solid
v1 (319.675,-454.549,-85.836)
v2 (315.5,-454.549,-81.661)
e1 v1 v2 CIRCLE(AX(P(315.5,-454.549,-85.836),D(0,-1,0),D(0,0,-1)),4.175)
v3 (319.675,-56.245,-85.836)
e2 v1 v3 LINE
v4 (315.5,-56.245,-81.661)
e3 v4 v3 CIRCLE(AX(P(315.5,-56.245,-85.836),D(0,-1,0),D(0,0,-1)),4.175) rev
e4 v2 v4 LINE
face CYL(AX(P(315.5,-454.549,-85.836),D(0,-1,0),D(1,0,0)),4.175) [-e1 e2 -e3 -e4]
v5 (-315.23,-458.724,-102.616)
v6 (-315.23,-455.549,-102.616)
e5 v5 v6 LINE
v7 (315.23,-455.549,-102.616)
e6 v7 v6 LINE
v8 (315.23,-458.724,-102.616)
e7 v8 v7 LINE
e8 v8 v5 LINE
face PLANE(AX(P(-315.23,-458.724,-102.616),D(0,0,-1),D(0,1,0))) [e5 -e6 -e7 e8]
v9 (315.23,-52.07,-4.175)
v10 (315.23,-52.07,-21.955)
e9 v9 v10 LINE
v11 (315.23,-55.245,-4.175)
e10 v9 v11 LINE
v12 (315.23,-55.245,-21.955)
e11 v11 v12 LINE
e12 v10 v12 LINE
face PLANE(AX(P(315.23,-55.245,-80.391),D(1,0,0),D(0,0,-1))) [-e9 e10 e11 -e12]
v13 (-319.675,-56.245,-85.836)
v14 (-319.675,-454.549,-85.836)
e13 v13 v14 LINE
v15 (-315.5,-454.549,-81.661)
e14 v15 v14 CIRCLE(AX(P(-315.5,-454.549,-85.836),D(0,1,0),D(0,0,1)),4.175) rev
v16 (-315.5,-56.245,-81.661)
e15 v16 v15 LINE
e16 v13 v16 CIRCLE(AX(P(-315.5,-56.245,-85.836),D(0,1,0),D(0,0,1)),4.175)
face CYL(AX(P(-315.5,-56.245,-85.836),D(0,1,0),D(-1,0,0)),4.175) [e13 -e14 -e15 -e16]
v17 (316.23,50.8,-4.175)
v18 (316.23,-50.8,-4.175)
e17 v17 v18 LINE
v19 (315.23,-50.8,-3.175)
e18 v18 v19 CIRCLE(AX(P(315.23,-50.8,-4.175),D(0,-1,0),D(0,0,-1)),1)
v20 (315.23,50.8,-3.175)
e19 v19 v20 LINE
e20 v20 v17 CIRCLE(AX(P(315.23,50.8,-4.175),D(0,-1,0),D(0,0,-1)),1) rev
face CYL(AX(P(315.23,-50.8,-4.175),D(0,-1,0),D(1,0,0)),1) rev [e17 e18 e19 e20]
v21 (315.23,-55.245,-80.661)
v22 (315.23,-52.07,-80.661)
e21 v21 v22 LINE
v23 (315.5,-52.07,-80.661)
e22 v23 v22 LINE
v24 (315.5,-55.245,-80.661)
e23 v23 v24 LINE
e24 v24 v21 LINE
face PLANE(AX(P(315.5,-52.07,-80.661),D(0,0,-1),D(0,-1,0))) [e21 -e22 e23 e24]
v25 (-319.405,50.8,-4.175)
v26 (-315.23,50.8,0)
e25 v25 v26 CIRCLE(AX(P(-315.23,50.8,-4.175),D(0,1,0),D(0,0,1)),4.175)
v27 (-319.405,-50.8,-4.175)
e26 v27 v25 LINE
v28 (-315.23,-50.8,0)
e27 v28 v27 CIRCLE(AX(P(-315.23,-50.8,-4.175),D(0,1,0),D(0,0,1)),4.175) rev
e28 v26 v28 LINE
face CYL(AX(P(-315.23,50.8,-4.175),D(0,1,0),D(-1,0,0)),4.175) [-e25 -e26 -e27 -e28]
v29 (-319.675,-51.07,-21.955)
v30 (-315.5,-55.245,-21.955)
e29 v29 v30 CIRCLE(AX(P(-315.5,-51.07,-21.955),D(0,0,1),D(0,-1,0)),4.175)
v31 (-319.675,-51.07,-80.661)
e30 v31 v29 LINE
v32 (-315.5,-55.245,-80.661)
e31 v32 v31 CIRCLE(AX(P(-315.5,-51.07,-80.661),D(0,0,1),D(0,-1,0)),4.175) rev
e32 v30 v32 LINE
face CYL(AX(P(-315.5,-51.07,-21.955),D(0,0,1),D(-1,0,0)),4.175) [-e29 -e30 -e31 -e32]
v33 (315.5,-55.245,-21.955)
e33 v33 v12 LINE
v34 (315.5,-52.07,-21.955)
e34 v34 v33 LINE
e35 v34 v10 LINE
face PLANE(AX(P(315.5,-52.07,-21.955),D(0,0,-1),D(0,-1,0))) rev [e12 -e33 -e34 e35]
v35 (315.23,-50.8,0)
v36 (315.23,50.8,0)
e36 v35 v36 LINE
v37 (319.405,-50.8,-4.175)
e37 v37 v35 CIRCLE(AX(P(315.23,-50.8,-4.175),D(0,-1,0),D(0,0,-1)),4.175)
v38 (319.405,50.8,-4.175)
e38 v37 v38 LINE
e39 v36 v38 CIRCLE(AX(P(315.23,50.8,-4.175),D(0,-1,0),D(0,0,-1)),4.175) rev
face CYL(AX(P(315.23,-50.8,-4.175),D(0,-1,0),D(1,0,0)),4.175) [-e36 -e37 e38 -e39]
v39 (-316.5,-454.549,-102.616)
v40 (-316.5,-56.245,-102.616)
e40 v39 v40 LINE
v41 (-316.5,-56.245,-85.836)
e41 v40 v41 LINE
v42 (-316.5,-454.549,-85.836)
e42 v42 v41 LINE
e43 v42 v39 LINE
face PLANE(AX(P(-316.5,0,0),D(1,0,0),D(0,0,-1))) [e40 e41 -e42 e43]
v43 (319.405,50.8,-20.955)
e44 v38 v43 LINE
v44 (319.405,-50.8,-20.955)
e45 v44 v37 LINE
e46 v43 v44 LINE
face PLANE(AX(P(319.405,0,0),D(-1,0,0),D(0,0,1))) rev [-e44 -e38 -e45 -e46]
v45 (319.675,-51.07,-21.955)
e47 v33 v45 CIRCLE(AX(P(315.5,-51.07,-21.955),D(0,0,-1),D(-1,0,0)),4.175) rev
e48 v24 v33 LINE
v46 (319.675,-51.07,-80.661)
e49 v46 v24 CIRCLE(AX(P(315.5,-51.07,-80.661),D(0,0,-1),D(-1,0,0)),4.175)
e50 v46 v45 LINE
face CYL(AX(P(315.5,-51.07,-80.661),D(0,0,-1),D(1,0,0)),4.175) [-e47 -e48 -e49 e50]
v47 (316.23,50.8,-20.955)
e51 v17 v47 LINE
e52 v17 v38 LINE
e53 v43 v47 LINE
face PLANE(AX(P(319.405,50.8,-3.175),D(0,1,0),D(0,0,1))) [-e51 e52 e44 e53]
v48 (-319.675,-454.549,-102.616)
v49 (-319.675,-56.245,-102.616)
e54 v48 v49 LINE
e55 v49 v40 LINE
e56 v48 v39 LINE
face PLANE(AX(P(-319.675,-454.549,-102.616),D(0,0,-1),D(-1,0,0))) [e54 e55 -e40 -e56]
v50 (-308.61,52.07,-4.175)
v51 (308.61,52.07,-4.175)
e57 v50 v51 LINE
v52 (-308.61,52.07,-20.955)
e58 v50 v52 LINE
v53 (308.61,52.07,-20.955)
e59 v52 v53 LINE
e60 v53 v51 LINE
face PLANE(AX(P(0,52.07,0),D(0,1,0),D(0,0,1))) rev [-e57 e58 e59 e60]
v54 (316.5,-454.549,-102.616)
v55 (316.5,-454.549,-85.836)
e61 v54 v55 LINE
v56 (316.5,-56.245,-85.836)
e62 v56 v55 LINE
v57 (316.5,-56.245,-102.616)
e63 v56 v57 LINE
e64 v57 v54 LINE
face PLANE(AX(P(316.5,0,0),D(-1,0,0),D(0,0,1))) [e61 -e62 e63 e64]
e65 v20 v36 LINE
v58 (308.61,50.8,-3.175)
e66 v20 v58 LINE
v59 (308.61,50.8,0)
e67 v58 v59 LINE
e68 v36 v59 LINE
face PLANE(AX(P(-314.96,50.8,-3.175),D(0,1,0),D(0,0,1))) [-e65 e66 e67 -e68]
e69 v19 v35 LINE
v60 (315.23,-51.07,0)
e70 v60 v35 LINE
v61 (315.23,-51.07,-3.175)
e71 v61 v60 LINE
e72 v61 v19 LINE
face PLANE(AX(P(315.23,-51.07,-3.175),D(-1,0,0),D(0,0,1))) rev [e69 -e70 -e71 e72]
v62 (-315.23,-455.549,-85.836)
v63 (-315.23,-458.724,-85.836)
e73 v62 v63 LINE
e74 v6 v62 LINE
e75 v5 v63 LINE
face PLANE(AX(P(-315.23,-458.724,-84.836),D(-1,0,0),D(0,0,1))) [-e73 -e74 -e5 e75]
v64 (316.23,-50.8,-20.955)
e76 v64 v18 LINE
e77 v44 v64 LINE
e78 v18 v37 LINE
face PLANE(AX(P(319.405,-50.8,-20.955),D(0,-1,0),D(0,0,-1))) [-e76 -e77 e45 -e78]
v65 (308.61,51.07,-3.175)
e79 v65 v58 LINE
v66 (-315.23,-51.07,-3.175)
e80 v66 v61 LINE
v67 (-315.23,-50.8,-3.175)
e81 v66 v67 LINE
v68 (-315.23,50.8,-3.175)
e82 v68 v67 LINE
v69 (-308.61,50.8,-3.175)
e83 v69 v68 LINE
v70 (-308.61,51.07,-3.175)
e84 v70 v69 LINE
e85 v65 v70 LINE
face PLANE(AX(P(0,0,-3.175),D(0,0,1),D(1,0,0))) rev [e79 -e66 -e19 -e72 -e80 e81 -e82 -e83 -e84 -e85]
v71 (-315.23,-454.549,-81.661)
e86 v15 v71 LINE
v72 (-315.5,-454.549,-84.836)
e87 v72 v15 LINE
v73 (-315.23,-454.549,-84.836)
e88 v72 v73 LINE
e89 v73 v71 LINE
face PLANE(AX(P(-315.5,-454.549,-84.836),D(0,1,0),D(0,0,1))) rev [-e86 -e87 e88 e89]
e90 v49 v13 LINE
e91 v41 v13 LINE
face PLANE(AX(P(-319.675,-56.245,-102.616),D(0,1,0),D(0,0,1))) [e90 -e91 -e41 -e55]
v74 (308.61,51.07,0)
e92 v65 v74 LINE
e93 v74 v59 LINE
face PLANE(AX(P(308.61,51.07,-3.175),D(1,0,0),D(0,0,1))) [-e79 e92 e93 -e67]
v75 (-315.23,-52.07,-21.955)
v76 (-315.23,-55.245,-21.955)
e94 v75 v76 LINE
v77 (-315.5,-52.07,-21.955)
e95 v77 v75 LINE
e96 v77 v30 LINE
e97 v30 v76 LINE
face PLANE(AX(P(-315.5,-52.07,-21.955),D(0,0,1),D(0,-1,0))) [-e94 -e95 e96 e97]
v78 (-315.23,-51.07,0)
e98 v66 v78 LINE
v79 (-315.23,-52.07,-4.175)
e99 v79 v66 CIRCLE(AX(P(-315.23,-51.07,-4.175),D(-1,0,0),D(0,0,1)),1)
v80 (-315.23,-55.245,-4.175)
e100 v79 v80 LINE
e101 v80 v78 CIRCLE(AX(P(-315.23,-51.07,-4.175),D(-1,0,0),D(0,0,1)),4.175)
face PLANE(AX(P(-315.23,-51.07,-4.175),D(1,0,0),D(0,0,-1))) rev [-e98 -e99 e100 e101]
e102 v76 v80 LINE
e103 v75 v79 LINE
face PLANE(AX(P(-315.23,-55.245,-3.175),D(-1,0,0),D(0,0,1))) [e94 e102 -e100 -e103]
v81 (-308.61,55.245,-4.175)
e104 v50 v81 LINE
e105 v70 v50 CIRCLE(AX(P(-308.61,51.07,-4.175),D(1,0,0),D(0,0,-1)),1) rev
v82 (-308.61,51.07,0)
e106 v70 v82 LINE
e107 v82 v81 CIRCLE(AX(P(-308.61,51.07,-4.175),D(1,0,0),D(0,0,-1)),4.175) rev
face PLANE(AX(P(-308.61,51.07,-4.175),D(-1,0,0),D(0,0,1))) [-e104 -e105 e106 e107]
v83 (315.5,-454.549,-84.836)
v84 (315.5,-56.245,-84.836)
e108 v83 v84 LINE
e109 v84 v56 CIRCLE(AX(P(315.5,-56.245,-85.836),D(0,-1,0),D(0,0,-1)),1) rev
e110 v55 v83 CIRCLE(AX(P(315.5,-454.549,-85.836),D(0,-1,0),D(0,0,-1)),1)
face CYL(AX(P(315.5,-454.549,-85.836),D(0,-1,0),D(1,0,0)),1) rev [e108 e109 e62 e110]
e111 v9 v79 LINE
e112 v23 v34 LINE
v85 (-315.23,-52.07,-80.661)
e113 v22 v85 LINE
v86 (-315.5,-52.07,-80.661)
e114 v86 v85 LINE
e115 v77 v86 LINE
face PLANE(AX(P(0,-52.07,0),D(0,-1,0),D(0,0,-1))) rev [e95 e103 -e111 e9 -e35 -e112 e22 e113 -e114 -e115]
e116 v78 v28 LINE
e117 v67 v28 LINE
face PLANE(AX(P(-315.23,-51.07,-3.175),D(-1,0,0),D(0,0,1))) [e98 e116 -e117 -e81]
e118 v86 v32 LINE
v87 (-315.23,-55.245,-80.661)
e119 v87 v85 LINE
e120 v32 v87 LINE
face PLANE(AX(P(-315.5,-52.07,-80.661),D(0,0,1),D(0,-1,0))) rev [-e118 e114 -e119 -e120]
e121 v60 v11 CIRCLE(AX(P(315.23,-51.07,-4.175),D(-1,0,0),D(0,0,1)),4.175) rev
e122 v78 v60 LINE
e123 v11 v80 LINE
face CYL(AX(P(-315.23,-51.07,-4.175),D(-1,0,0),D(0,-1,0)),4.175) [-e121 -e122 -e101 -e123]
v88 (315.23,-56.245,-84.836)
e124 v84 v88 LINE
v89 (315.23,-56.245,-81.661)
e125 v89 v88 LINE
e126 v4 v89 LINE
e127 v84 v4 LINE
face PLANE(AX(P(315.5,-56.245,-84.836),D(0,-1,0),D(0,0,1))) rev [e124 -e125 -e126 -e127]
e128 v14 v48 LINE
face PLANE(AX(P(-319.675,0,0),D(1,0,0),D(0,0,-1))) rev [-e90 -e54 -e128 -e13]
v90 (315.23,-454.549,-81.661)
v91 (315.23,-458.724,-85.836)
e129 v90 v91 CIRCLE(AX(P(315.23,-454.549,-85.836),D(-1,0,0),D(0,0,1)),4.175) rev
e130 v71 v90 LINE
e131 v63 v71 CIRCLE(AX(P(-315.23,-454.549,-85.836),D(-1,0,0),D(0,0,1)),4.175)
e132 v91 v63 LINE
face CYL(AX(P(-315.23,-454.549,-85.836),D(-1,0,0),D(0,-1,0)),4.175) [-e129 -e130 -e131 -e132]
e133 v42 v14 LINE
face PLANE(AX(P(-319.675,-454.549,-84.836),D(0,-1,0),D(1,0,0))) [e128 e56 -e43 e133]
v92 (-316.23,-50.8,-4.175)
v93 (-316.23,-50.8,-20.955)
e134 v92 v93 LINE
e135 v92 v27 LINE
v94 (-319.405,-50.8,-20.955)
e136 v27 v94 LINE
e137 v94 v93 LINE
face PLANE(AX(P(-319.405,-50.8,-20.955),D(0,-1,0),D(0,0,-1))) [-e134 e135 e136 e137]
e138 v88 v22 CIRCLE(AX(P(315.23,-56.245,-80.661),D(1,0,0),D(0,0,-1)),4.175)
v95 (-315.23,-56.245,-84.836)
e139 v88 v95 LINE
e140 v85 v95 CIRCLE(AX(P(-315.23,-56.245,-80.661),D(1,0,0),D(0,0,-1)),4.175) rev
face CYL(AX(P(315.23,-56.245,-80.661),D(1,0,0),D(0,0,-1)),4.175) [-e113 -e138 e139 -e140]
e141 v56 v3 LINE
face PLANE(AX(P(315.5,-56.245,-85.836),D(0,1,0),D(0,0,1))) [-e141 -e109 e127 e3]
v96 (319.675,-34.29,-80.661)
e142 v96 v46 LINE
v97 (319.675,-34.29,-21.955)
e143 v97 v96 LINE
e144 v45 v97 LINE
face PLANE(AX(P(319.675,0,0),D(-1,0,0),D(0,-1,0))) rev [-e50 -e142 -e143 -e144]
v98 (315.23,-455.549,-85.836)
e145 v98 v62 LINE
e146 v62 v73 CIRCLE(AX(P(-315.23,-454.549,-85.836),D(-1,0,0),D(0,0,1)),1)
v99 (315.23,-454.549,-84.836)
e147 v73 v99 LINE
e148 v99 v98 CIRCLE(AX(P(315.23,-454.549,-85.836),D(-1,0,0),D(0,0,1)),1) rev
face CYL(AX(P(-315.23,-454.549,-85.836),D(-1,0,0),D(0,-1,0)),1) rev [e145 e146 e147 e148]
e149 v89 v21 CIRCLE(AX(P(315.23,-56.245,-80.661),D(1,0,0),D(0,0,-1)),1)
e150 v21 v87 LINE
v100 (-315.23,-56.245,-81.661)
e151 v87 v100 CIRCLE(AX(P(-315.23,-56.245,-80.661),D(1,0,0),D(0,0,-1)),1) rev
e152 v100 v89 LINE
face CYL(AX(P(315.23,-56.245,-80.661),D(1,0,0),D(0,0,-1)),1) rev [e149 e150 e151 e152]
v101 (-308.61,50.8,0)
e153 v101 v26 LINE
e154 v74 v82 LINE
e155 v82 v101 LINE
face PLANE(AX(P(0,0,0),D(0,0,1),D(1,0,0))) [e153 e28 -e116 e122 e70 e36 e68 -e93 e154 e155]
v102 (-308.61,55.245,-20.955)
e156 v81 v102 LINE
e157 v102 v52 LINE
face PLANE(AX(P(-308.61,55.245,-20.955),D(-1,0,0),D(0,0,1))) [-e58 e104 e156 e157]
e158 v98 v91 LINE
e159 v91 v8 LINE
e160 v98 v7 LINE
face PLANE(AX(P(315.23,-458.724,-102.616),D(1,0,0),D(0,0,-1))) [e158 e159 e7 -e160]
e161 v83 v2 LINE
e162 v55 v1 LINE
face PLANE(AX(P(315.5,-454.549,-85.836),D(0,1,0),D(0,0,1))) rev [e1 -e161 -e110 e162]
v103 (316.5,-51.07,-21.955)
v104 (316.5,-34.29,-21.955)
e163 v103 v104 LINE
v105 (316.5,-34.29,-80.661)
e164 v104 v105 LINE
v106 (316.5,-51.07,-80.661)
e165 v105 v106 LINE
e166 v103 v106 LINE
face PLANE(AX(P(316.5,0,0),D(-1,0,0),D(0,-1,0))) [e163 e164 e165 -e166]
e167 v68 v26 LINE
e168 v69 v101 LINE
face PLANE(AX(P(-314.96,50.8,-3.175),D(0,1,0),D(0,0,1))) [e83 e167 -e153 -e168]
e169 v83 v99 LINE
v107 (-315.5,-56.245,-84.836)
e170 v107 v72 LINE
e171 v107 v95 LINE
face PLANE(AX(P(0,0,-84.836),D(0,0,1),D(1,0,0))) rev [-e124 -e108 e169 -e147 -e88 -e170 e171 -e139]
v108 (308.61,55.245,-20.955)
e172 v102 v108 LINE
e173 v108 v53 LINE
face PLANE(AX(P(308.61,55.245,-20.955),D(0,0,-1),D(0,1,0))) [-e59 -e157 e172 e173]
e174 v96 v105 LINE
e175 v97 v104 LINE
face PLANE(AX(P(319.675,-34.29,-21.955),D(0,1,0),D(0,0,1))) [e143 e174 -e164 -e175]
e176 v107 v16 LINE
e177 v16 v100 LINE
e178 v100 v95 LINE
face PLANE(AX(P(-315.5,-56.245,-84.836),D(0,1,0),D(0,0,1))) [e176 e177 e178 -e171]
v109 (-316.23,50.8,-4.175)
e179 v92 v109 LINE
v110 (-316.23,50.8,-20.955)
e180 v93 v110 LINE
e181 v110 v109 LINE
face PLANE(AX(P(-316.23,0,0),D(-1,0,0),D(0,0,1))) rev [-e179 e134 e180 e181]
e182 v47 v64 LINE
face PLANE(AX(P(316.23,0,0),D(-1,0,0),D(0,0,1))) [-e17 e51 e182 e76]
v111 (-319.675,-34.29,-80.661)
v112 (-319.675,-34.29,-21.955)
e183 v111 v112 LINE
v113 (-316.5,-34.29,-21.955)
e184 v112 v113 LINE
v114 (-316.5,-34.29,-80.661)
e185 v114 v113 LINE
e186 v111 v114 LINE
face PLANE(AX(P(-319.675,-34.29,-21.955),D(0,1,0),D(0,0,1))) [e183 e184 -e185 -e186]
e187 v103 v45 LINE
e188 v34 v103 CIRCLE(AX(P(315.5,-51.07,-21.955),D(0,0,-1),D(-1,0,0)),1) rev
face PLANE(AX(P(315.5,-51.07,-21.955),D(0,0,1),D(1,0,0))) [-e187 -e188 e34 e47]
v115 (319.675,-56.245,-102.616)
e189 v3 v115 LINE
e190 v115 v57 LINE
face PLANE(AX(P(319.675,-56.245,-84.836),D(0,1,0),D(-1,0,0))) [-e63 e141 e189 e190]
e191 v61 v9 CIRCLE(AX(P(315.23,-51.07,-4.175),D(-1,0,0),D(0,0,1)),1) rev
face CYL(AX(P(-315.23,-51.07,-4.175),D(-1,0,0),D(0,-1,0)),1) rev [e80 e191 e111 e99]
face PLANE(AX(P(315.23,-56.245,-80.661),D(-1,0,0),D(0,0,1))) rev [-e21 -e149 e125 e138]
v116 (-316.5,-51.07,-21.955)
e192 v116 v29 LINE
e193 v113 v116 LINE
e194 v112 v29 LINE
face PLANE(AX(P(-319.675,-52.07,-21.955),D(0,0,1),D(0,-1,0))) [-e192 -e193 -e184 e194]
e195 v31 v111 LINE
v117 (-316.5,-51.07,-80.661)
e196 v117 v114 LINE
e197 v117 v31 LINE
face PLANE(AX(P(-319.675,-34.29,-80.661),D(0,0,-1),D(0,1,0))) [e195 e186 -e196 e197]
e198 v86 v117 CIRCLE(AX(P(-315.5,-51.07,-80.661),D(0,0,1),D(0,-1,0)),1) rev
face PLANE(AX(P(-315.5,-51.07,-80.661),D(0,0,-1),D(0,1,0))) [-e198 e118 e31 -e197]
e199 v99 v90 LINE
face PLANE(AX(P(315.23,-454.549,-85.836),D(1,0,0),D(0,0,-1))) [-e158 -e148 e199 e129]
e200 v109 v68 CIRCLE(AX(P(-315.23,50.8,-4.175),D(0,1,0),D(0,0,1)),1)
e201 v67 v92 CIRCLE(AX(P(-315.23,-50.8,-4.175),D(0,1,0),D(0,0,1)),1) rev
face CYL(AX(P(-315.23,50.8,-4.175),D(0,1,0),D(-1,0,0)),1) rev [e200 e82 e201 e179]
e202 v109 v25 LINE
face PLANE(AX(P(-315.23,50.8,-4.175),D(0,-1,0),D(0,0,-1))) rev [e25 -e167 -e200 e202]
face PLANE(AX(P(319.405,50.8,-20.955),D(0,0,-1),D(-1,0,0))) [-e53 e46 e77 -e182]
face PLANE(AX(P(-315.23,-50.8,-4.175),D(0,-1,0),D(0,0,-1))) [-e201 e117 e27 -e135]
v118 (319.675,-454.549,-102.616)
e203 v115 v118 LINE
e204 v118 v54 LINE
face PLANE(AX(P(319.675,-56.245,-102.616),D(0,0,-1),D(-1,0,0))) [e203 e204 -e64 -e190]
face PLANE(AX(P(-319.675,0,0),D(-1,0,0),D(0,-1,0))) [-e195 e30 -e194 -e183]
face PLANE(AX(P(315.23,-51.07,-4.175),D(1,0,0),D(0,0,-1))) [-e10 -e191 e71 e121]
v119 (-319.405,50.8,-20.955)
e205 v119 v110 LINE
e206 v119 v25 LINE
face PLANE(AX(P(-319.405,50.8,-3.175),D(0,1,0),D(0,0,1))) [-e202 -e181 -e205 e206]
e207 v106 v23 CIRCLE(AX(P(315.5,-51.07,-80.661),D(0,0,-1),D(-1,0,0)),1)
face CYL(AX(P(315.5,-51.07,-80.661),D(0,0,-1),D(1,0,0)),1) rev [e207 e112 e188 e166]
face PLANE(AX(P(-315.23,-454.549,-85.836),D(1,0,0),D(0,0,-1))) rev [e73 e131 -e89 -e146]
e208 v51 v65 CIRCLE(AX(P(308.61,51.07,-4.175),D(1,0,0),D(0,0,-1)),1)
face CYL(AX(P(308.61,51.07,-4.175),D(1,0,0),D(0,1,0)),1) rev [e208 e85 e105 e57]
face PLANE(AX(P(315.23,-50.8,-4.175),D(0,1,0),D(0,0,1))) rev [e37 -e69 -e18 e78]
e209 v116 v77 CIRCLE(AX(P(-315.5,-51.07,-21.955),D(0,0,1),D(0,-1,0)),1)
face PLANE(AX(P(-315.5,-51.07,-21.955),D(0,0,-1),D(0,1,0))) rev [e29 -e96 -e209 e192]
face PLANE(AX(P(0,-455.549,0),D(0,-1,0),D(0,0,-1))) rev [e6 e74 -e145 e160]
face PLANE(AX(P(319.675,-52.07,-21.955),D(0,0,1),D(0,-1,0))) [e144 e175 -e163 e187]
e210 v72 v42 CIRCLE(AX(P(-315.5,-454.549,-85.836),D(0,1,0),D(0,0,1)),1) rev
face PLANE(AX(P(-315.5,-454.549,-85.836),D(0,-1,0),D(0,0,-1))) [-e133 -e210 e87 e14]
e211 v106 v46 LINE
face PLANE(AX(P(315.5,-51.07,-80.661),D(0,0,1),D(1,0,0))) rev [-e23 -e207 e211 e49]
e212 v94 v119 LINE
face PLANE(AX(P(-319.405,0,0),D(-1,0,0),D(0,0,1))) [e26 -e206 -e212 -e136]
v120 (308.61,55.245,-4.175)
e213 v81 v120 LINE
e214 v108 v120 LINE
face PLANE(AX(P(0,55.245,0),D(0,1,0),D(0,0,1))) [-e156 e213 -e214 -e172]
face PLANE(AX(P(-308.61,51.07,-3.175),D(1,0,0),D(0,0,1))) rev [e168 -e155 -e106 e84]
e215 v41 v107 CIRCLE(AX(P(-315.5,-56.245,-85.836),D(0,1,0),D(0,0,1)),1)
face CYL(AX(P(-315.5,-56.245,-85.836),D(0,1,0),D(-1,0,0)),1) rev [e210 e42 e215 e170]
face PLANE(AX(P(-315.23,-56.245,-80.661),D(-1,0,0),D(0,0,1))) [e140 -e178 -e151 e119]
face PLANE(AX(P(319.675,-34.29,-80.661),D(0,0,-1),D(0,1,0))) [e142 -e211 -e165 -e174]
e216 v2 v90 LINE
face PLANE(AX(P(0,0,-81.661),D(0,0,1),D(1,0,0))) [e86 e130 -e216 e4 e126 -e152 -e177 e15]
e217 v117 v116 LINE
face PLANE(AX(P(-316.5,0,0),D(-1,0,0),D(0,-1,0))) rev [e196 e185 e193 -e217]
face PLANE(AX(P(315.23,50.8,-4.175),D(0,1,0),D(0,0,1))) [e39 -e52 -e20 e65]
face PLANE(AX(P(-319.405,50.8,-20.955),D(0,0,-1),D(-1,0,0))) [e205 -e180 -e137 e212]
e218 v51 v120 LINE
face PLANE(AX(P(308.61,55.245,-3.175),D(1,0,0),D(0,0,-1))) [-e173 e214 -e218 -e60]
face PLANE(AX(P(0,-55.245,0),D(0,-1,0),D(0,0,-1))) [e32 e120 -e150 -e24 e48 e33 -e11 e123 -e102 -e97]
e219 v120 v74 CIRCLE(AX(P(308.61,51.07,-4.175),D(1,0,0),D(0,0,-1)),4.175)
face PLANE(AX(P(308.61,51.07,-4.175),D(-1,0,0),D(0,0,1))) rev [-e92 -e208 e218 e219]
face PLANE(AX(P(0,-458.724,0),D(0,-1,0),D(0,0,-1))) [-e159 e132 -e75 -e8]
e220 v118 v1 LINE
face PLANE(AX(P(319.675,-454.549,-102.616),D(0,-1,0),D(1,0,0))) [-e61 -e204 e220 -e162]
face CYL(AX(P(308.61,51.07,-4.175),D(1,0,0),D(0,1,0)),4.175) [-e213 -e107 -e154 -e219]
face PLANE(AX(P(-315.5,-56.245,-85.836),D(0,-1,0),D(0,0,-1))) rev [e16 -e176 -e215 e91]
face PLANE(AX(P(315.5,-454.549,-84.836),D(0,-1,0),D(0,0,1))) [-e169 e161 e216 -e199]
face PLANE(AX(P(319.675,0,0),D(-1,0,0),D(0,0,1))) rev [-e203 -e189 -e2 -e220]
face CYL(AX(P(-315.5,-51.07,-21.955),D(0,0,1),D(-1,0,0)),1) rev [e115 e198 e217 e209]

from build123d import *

# Parameters (mm, degrees)
SKETCH1_W                 = 629.92
SKETCH1_H                 = 101.6
BASE_FLANGE1_DEPTH        = 3.175
EDGE_FLANGE1_DEPTH        = 617.22
EDGE_FLANGE2_DEPTH        = 101.6
EDGE_FLANGE2_BEND_DEPTH   = 101.6
EDGE_FLANGE3_DEPTH        = 630.46
EDGE_FLANGE4_DEPTH        = 630.46
EDGE_FLANGE5_DEPTH        = 630.46
EDGE_FLANGE6_DEPTH        = 58.706
EDGE_FLANGE6_BEND_DEPTH   = 58.706
EDGE_FLANGE6_BEND_2_DEPTH = 398.304
EDGE_FLANGE6_BEND_3_DEPTH = 398.304


# Sheet-metal steps are written as plain solids
with BuildPart() as part:
    # Sketch1 → Base-Flange1 (new body)
    with BuildSketch(Plane.XY):
        Rectangle(SKETCH1_W, SKETCH1_H)
    extrude(amount=-BASE_FLANGE1_DEPTH)

    # Edge-Flange1 section (across the edge) → Edge-Flange1 (add)
    with BuildSketch(Plane(origin=(-308.61, 52.07, -3.175), x_dir=(0, -1, 0), z_dir=(1, 0, 0))):
        with BuildLine():
            Line((-3.175, 1), (-3.175, 17.78))
            Line((-3.175, 17.78), (0, 17.78))
            Line((0, 17.78), (0, 1))
            ThreePointArc((0, 1), (0.292893219, 0.292893219), (1, 0))
            Line((1, 0), (1.27, 0))
            Line((1.27, 0), (1.27, -3.175))
            Line((1.27, -3.175), (1, -3.175))
            ThreePointArc((1, -3.175), (-1.952170811, -1.952170811), (-3.175, 1))
        make_face()
    extrude(amount=EDGE_FLANGE1_DEPTH)

    # Edge-Flange2 section (across the edge) → Edge-Flange2 (add)
    with BuildSketch(Plane(origin=(-316.23, -50.8, -3.175), x_dir=(1, 0, 0), z_dir=(0, 1, 0))):
        with BuildLine():
            Line((-3.175, 1), (-3.175, 17.78))
            Line((-3.175, 17.78), (0, 17.78))
            Line((0, 17.78), (0, 1))
            ThreePointArc((0, 1), (0.292893219, 0.292893219), (1, 0))
            Line((1, 0), (1.27, 0))
            Line((1.27, 0), (1.27, -3.175))
            Line((1.27, -3.175), (1, -3.175))
            ThreePointArc((1, -3.175), (-1.952170811, -1.952170811), (-3.175, 1))
        make_face()
    extrude(amount=EDGE_FLANGE2_DEPTH)

    # Edge-Flange2 section 2 (across the edge) → Edge-Flange2 bend (add)
    with BuildSketch(Plane(origin=(316.23, 50.8, -3.175), x_dir=(-1, 0, 0), z_dir=(0, -1, 0))):
        with BuildLine():
            Line((-3.175, 1), (-3.175, 17.78))
            Line((-3.175, 17.78), (0, 17.78))
            Line((0, 17.78), (0, 1))
            ThreePointArc((0, 1), (0.292893219, 0.292893219), (1, 0))
            Line((1, 0), (1.27, 0))
            Line((1.27, 0), (1.27, -3.175))
            Line((1.27, -3.175), (1, -3.175))
            ThreePointArc((1, -3.175), (-1.952170811, -1.952170811), (-3.175, 1))
        make_face()
    extrude(amount=EDGE_FLANGE2_BEND_DEPTH)

    # Edge-Flange3 section (across the edge) → Edge-Flange3 (add)
    with BuildSketch(Plane(origin=(315.23, -52.07, -3.175), x_dir=(0, 1, 0), z_dir=(-1, 0, 0))):
        with BuildLine():
            Line((-3.175, 1), (-3.175, 77.216))
            Line((-3.175, 77.216), (0, 77.216))
            Line((0, 77.216), (0, 1))
            ThreePointArc((0, 1), (0.292893219, 0.292893219), (1, 0))
            Line((1, 0), (1.27, 0))
            Line((1.27, 0), (1.27, -3.175))
            Line((1.27, -3.175), (1, -3.175))
            ThreePointArc((1, -3.175), (-1.952170811, -1.952170811), (-3.175, 1))
        make_face()
    extrude(amount=EDGE_FLANGE3_DEPTH)

    # Edge-Flange4 section (across the edge) → Edge-Flange4 (add)
    with BuildSketch(Plane(origin=(-315.23, -55.245, -81.661), x_dir=(0, 0, 1), z_dir=(1, 0, 0))):
        with BuildLine():
            Line((-3.175, 1), (-3.175, 399.034))
            Line((-3.175, 399.034), (0, 399.034))
            Line((0, 399.034), (0, 1))
            ThreePointArc((0, 1), (0.292893219, 0.292893219), (1, 0))
            Line((1, 0), (1.27, 0))
            Line((1.27, 0), (1.27, -3.175))
            Line((1.27, -3.175), (1, -3.175))
            ThreePointArc((1, -3.175), (-1.952170811, -1.952170811), (-3.175, 1))
        make_face()
    extrude(amount=EDGE_FLANGE4_DEPTH)

    # Edge-Flange5 section (across the edge) → Edge-Flange5 (add)
    with BuildSketch(Plane(origin=(315.23, -455.549, -84.836), x_dir=(0, 1, 0), z_dir=(-1, 0, 0))):
        with BuildLine():
            Line((-3.175, 1), (-3.175, 17.78))
            Line((-3.175, 17.78), (0, 17.78))
            Line((0, 17.78), (0, 1))
            ThreePointArc((0, 1), (0.292893219, 0.292893219), (1, 0))
            Line((1, 0), (1.27, 0))
            Line((1.27, 0), (1.27, -3.175))
            Line((1.27, -3.175), (1, -3.175))
            ThreePointArc((1, -3.175), (-1.952170811, -1.952170811), (-3.175, 1))
        make_face()
    extrude(amount=EDGE_FLANGE5_DEPTH)

    # Edge-Flange6 section (across the edge) → Edge-Flange6 (add)
    with BuildSketch(Plane(origin=(-316.5, -52.07, -80.661), x_dir=(1, 0, 0), z_dir=(0, 0, 1))):
        with BuildLine():
            Line((-3.175, 1), (-3.175, 17.78))
            Line((-3.175, 17.78), (0, 17.78))
            Line((0, 17.78), (0, 1))
            ThreePointArc((0, 1), (0.292893219, 0.292893219), (1, 0))
            Line((1, 0), (1.27, 0))
            Line((1.27, 0), (1.27, -3.175))
            Line((1.27, -3.175), (1, -3.175))
            ThreePointArc((1, -3.175), (-1.952170811, -1.952170811), (-3.175, 1))
        make_face()
    extrude(amount=EDGE_FLANGE6_DEPTH)

    # Edge-Flange6 section 2 (across the edge) → Edge-Flange6 bend (add)
    with BuildSketch(Plane(origin=(316.5, -52.07, -21.955), x_dir=(-1, 0, 0), z_dir=(0, 0, -1))):
        with BuildLine():
            Line((-3.175, 1), (-3.175, 17.78))
            Line((-3.175, 17.78), (0, 17.78))
            Line((0, 17.78), (0, 1))
            ThreePointArc((0, 1), (0.292893219, 0.292893219), (1, 0))
            Line((1, 0), (1.27, 0))
            Line((1.27, 0), (1.27, -3.175))
            Line((1.27, -3.175), (1, -3.175))
            ThreePointArc((1, -3.175), (-1.952170811, -1.952170811), (-3.175, 1))
        make_face()
    extrude(amount=EDGE_FLANGE6_BEND_DEPTH)

    # Edge-Flange6 section 3 (across the edge) → Edge-Flange6 bend 2 (add)
    with BuildSketch(Plane(origin=(-316.5, -454.549, -84.836), x_dir=(1, 0, 0), z_dir=(0, 1, 0))):
        with BuildLine():
            Line((-3.175, 1), (-3.175, 17.78))
            Line((-3.175, 17.78), (0, 17.78))
            Line((0, 17.78), (0, 1))
            ThreePointArc((0, 1), (0.292893219, 0.292893219), (1, 0))
            Line((1, 0), (1.27, 0))
            Line((1.27, 0), (1.27, -3.175))
            Line((1.27, -3.175), (1, -3.175))
            ThreePointArc((1, -3.175), (-1.952170811, -1.952170811), (-3.175, 1))
        make_face()
    extrude(amount=EDGE_FLANGE6_BEND_2_DEPTH)

    # Edge-Flange6 section 4 (across the edge) → Edge-Flange6 bend 3 (add)
    with BuildSketch(Plane(origin=(316.5, -56.245, -84.836), x_dir=(-1, 0, 0), z_dir=(0, -1, 0))):
        with BuildLine():
            Line((-3.175, 1), (-3.175, 17.78))
            Line((-3.175, 17.78), (0, 17.78))
            Line((0, 17.78), (0, 1))
            ThreePointArc((0, 1), (0.292893219, 0.292893219), (1, 0))
            Line((1, 0), (1.27, 0))
            Line((1.27, 0), (1.27, -3.175))
            Line((1.27, -3.175), (1, -3.175))
            ThreePointArc((1, -3.175), (-1.952170811, -1.952170811), (-3.175, 1))
        make_face()
    extrude(amount=EDGE_FLANGE6_BEND_3_DEPTH)


solid = part.part
